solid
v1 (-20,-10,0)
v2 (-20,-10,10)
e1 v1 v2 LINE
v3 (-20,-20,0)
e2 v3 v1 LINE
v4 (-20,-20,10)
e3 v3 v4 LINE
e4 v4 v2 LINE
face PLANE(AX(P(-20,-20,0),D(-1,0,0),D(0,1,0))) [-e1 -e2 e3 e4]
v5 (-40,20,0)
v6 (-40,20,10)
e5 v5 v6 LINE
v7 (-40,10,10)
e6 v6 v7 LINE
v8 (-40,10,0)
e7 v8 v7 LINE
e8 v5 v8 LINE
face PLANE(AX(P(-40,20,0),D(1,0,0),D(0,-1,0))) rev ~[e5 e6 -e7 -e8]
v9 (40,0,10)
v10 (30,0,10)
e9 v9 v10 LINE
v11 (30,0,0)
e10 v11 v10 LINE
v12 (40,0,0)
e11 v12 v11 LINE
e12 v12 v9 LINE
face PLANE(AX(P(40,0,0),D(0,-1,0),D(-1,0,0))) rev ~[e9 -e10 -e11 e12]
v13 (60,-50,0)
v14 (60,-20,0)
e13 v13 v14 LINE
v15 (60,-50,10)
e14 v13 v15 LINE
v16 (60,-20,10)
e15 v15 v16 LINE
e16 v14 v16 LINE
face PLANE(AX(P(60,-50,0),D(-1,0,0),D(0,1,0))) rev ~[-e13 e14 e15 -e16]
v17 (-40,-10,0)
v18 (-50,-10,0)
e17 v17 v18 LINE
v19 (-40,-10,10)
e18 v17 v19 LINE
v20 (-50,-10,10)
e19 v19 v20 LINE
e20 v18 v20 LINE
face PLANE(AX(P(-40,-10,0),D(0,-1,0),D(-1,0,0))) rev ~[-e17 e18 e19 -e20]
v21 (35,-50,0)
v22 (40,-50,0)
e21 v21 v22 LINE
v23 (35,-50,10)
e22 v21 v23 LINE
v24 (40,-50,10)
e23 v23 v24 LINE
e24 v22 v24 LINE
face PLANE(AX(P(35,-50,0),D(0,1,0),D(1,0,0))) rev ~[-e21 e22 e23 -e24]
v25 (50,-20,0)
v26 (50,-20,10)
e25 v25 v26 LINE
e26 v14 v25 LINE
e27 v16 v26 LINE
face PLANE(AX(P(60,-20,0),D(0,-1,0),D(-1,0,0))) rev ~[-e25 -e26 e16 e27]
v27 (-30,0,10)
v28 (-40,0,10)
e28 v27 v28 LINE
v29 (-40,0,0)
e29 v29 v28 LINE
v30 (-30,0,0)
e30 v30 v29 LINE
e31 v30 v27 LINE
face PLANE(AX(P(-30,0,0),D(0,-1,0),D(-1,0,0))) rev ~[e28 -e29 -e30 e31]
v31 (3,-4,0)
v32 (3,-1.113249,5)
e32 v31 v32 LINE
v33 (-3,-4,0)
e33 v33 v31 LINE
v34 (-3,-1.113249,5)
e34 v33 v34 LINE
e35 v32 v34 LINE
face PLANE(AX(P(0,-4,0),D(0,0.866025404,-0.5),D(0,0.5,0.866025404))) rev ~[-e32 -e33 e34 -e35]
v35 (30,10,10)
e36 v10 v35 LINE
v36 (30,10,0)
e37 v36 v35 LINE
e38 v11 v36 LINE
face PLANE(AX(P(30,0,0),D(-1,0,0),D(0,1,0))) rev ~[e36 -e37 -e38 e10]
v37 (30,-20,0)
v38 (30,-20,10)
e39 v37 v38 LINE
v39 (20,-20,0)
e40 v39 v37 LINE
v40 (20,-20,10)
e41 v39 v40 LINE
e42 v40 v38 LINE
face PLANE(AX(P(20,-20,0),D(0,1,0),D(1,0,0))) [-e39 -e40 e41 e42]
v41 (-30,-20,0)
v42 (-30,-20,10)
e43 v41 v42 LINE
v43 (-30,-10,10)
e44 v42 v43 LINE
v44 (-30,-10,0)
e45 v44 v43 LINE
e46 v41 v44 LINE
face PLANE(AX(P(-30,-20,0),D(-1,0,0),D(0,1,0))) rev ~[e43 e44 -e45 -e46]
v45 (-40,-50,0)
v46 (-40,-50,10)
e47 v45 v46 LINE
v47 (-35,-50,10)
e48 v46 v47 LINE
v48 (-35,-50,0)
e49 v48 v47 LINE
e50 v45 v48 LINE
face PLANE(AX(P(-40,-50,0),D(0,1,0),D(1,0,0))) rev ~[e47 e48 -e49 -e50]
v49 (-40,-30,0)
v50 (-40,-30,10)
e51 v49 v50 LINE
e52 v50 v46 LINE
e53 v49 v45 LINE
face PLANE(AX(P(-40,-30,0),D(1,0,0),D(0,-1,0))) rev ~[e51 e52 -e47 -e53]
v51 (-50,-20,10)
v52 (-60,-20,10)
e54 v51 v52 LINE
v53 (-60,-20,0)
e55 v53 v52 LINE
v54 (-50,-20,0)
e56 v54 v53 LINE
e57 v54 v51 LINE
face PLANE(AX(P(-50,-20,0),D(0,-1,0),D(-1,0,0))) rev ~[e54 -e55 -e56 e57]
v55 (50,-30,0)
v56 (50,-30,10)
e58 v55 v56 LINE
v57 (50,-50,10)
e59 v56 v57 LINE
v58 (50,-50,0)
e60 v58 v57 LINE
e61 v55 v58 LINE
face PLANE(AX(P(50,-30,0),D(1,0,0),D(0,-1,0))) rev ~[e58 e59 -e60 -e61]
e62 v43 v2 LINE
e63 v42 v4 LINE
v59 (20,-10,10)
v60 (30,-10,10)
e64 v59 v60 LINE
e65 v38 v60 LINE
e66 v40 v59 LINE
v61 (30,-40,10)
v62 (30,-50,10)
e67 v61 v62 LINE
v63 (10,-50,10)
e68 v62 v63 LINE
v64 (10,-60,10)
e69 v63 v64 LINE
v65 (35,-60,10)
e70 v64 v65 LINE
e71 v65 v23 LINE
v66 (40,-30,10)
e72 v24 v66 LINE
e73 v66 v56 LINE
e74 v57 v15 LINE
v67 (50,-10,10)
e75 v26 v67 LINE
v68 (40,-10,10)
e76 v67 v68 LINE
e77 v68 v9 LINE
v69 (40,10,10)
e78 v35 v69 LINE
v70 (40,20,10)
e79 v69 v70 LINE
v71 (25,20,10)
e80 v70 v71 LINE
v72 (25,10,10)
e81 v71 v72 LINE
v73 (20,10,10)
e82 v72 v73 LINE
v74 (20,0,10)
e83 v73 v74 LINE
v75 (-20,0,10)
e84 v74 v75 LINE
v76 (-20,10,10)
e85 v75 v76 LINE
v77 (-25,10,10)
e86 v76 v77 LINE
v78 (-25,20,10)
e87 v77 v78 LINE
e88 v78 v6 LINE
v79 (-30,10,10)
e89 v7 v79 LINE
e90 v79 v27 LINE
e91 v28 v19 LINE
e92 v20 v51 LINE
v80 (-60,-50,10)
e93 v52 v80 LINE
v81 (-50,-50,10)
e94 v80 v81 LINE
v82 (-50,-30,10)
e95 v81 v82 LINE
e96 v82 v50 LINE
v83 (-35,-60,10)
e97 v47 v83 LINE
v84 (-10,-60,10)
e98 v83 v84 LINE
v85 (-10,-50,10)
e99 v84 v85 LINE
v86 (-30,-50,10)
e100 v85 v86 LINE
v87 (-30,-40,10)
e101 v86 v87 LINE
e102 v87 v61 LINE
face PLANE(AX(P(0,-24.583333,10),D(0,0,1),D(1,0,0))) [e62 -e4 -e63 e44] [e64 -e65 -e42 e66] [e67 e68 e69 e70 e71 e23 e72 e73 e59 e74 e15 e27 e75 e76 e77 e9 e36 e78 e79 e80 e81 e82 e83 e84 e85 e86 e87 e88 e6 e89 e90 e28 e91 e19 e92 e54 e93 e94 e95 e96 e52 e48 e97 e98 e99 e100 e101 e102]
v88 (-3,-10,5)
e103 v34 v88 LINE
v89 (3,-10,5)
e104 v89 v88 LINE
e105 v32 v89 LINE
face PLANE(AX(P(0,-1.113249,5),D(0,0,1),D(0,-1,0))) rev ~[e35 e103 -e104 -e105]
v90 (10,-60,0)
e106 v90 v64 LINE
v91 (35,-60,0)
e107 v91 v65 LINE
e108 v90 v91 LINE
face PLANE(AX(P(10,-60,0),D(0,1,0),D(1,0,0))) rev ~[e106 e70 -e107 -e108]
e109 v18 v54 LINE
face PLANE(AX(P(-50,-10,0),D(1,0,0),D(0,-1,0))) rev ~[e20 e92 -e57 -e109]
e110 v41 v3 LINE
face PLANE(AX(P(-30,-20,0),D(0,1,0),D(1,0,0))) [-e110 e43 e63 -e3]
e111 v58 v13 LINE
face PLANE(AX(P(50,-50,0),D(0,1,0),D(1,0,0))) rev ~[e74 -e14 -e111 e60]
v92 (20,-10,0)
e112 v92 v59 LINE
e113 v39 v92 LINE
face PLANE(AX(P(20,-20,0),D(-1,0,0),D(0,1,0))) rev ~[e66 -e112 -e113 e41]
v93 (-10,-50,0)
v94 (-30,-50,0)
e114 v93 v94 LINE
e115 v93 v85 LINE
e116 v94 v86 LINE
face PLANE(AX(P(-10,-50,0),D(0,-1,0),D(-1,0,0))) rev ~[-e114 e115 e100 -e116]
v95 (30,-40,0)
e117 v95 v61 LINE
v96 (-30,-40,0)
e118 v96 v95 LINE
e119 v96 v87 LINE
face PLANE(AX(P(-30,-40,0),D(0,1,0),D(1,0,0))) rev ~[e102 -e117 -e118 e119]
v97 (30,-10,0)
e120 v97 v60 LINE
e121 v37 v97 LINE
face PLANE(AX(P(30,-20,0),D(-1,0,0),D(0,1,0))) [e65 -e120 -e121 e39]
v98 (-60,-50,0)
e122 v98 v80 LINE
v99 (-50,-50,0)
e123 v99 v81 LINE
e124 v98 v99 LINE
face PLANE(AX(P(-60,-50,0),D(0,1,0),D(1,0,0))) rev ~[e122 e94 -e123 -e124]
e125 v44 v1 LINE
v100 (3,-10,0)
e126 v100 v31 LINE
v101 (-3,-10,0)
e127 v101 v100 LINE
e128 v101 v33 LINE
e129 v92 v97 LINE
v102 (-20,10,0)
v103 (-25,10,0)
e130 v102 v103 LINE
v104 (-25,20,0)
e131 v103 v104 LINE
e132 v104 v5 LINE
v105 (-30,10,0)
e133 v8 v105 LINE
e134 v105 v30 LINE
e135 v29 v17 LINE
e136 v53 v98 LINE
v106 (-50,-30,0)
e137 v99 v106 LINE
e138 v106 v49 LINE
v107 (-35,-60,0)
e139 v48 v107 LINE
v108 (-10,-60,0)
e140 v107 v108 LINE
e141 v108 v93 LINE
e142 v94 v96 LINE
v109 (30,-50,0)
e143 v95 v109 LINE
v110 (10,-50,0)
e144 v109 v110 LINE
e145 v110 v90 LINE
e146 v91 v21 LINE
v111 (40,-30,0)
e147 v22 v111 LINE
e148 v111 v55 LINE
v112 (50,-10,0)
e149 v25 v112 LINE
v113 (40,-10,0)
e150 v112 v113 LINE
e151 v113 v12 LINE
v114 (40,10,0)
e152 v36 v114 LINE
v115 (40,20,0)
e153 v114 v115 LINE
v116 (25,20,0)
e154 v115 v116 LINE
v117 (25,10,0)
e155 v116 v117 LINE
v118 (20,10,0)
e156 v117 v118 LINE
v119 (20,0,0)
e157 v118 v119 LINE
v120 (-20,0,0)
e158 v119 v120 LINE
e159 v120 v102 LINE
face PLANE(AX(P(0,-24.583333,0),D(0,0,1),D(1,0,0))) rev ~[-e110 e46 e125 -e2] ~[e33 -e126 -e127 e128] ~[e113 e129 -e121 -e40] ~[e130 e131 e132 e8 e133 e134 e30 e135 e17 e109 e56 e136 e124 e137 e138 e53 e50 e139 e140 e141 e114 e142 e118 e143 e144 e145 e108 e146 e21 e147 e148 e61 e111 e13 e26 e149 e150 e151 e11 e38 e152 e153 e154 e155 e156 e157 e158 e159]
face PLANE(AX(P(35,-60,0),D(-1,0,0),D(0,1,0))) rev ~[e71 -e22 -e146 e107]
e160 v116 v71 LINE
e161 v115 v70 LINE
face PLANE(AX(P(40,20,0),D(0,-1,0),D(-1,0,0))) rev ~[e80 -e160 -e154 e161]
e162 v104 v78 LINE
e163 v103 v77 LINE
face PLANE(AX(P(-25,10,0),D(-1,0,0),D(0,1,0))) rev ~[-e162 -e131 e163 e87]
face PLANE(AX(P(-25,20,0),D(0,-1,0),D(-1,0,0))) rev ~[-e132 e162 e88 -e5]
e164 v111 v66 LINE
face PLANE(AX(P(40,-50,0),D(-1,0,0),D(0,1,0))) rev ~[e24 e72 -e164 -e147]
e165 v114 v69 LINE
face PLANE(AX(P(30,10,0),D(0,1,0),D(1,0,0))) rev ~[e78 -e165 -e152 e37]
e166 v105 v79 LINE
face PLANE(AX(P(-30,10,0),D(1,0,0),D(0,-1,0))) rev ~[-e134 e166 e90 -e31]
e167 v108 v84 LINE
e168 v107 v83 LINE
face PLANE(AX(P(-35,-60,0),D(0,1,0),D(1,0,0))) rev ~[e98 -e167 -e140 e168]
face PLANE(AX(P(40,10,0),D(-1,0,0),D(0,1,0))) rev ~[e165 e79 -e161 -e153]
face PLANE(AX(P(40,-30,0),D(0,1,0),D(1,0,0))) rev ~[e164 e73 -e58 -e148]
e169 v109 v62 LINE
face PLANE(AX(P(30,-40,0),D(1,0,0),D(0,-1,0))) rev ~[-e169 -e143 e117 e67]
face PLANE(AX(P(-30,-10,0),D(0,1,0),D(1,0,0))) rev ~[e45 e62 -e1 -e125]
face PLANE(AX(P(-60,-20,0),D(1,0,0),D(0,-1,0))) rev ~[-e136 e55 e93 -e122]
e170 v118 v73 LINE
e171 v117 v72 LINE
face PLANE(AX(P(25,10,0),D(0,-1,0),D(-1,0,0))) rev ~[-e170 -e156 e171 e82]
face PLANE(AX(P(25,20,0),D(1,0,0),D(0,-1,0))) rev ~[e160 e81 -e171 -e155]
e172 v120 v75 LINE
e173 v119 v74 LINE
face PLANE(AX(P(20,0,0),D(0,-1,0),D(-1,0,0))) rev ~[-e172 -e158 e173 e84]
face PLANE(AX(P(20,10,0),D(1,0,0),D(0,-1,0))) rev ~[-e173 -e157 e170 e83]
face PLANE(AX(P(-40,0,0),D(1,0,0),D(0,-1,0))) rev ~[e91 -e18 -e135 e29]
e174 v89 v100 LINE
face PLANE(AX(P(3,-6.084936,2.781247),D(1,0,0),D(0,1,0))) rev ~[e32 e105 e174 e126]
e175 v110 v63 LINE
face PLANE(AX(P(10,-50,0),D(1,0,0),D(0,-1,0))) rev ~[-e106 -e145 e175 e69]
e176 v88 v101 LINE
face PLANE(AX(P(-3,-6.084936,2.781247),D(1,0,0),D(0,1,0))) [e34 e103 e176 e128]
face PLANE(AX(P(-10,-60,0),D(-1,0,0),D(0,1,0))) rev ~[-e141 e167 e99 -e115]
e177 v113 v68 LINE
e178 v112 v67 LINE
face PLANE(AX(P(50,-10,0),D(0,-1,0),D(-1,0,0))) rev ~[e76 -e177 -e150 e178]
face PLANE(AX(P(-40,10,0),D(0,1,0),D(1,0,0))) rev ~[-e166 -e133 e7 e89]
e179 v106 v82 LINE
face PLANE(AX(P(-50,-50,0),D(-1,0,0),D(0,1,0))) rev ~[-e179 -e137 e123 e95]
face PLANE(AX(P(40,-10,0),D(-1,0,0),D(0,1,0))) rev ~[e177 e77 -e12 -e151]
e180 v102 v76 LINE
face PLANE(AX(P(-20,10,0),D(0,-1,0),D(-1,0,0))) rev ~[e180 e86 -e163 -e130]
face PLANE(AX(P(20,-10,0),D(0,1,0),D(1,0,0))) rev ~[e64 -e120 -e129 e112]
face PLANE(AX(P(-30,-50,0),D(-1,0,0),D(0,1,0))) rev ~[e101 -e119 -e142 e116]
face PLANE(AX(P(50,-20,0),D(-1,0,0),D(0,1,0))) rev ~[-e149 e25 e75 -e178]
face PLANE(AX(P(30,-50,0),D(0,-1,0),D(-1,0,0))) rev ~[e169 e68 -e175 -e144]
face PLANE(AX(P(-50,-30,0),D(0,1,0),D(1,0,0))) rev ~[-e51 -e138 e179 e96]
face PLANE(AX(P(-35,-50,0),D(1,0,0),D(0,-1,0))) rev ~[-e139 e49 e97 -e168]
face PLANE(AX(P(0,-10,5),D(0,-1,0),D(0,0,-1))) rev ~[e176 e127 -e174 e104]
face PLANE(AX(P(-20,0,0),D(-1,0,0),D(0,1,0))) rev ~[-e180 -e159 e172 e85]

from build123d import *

# Parameters (mm, degrees)
F0_W     = 10
F0_H     = 10
F0_R     = 6
F1_DEPTH = 10
F3_DEPTH = 3


with BuildPart() as f1:
    # F0 (on Top) → F1 (new body)
    with BuildSketch(Plane.XY):
        Polygon((10, 0), (0, 0), (-10, 0), (-20, 0), (-20, 10), (-25, 10), (-30, 10), (-30, 0), (-40, 0), (-40, -10), (-50, -10), (-50, -20), (-60, -20), (-60, -30), (-60, -50), (-50, -50), (-50, -30), (-40, -30), (-40, -40), (-40, -50), (-35, -50), (-30, -50), (-30, -40), (-20, -40), (-10, -40), (0, -40), (10, -40), (20, -40), (30, -40), (30, -50), (35, -50), (40, -50), (40, -40), (40, -30), (50, -30), (50, -50), (60, -50), (60, -30), (60, -20), (50, -20), (50, -10), (40, -10), (40, 0), (30, 0), (30, 10), (25, 10), (20, 10), (20, 0), align=None)
        with Locations((-25, -15)):
            Rectangle(F0_W, F0_H, mode=Mode.SUBTRACT)
        with Locations((0, -12)):
            Circle(F0_R, mode=Mode.SUBTRACT)
        with Locations((25, -15)):
            Rectangle(F0_W, F0_H, mode=Mode.SUBTRACT)
        Polygon((-30, 10), (-25, 10), (-25, 20), (-30, 20), (-40, 20), (-40, 10), align=None)
        Polygon((25, 20), (25, 10), (30, 10), (40, 10), (40, 20), (30, 20), align=None)
        Polygon((-30, -50), (-35, -50), (-35, -60), (-10, -60), (-10, -50), align=None)
        Polygon((35, -60), (35, -50), (30, -50), (10, -50), (10, -60), align=None)
        with Locations((0, -12)):
            Circle(F0_R)
    extrude(amount=F1_DEPTH)

    # F2 (on Right) → F3 (cut, symmetric)
    with BuildSketch(Plane.YZ):
        Polygon((-10, 5), (-10, 0), (-4, 0), (-1.1132486541, 5), align=None)
    extrude(amount=F3_DEPTH, both=True, mode=Mode.SUBTRACT)


solid = f1.part
